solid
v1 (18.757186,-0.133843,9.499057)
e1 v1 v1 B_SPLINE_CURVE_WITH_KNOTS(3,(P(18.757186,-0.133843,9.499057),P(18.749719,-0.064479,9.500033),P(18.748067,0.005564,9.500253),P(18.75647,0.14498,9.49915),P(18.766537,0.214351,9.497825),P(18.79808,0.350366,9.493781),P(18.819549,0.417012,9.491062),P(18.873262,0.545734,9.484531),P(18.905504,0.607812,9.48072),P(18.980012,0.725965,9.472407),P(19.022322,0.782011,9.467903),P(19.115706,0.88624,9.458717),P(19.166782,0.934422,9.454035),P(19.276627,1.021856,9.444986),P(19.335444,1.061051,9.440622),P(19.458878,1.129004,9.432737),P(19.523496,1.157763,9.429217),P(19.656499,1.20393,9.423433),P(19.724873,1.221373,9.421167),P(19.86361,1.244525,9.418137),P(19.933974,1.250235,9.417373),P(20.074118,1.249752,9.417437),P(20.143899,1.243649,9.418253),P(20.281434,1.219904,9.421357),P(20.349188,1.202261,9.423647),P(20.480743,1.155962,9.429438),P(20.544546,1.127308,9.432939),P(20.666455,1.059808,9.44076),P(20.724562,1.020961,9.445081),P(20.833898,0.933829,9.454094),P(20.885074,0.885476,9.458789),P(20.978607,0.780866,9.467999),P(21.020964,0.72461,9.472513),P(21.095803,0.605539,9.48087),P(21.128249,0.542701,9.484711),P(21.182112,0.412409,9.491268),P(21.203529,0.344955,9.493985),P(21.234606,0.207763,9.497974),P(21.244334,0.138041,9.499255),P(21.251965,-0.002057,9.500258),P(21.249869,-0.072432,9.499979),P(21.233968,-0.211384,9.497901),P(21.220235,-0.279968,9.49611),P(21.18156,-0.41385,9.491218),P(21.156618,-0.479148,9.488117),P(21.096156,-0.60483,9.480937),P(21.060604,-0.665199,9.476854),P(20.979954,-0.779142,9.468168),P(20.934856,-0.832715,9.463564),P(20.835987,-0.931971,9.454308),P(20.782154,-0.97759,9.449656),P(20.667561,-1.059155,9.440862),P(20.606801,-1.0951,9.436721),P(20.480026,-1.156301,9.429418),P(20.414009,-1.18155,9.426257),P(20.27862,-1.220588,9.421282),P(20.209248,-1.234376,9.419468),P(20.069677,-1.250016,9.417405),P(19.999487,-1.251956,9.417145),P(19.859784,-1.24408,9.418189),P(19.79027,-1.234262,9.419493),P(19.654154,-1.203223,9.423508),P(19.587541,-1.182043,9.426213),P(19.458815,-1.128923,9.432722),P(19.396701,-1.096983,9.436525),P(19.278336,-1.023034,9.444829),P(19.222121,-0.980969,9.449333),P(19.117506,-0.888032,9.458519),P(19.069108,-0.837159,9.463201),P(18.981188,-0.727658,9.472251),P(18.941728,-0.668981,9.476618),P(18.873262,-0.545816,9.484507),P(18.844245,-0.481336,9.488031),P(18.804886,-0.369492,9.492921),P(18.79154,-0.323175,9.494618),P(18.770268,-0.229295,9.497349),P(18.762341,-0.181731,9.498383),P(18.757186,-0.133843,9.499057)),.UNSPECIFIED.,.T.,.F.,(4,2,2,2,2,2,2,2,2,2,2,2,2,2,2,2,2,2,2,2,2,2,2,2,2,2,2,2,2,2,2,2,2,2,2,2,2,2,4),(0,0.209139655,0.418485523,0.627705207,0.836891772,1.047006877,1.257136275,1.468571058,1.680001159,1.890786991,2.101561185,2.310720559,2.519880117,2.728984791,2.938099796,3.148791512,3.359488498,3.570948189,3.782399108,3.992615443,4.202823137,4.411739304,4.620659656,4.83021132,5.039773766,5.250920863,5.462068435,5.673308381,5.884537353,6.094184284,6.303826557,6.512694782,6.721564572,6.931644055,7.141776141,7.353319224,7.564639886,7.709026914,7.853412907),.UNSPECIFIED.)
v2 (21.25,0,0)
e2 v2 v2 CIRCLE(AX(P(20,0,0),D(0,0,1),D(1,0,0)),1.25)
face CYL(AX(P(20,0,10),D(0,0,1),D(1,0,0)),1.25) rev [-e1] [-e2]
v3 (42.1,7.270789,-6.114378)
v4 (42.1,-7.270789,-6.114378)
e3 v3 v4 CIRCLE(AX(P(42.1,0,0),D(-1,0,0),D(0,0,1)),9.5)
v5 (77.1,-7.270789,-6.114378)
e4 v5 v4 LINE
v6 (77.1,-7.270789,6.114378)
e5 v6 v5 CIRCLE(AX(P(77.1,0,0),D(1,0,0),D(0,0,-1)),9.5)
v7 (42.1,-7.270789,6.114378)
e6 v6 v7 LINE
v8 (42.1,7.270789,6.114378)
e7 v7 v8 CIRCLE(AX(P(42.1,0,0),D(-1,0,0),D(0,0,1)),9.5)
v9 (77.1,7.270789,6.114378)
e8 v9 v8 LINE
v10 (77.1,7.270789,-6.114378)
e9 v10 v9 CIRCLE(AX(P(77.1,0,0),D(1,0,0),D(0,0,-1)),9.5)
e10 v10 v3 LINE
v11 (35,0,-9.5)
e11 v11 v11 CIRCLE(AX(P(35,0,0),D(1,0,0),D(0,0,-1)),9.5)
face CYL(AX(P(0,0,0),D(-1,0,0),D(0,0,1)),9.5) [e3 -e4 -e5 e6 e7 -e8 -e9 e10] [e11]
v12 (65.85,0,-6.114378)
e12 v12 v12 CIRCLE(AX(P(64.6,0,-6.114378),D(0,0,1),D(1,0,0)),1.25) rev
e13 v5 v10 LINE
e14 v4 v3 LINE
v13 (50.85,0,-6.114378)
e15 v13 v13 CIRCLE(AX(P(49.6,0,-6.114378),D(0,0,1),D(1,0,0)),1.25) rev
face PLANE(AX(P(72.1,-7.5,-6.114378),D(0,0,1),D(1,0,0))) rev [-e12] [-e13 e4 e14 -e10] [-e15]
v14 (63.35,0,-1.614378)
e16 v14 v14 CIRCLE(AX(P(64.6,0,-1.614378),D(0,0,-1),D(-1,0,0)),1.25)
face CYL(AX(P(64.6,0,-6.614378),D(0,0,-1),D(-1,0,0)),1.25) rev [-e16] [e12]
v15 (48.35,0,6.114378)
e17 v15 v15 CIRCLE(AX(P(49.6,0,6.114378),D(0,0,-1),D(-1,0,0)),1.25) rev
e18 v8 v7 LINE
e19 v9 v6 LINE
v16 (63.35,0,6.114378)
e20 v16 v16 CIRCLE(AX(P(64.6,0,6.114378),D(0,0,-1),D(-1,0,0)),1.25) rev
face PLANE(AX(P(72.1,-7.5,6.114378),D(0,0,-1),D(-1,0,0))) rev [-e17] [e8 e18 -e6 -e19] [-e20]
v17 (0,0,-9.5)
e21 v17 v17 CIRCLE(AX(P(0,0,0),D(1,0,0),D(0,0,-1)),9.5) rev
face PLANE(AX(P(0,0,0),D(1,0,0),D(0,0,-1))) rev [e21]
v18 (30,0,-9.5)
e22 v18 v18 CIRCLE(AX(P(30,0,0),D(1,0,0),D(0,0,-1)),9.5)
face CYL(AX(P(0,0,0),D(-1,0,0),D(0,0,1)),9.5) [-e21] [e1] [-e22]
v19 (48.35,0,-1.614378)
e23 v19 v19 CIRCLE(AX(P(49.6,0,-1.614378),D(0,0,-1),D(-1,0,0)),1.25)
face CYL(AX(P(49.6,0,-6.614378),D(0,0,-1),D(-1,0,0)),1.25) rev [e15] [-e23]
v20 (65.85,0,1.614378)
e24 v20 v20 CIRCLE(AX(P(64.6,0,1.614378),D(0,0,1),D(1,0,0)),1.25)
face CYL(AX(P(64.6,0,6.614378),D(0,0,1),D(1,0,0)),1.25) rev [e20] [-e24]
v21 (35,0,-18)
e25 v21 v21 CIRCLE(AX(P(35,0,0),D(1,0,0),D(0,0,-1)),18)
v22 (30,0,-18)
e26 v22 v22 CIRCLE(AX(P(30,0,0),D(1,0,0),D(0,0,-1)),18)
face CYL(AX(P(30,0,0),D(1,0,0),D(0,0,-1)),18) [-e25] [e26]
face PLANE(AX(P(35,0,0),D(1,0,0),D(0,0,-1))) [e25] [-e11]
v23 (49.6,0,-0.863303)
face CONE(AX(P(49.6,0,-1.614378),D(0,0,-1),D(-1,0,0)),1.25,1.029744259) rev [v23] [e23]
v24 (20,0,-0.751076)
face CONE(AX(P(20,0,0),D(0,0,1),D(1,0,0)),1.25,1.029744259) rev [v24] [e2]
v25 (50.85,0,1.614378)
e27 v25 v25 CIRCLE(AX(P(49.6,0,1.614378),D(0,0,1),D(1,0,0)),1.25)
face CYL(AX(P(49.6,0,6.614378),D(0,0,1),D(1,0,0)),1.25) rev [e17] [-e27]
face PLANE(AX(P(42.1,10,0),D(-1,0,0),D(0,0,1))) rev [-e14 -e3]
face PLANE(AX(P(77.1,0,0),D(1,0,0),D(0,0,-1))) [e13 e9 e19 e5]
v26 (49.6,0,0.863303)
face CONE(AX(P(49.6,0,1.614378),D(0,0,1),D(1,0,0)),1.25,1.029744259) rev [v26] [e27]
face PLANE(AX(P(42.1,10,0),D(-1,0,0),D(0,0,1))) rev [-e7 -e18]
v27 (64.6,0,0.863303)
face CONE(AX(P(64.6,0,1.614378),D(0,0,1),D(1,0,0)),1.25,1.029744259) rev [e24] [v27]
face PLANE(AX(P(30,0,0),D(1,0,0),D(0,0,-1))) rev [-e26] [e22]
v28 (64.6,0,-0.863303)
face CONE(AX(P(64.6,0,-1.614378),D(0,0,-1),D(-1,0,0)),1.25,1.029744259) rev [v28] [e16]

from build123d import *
from build123d.topology import SkipClean

# Parameters (mm, degrees)
SKETCH1_W                           = 42.1
SKETCH1_H                           = 10
BOSS_EXTRUDE1_START                 = 30
BOSS_EXTRUDE1_DEPTH                 = 30
BOSS_EXTRUDE2_START                 = -7.1
SKETCH8_R                           = 18
BOSS_EXTRUDE2_DEPTH                 = 5
M3X0_5_TAPPED_HOLE3_D               = 2.5
M3X0_5_TAPPED_HOLE3_DEPTH           = 10
M3X0_5_TAPPED_HOLE3_TIP             = 0.751076
M3X0_5_TAPPED_HOLE2_D               = 2.5
M3X0_5_TAPPED_HOLE2_DEPTH           = 5
M3X0_5_TAPPED_HOLE2_TIP             = 0.751076
M3X0_5_TAPPED_HOLE2_ON_FACE_2_D     = 2.5
M3X0_5_TAPPED_HOLE2_ON_FACE_2_DEPTH = 5
M3X0_5_TAPPED_HOLE2_ON_FACE_2_TIP   = 0.751076
BOSS_EXTRUDE3_START                 = 5
BOSS_EXTRUDE3_DEPTH                 = 5
TOLERANCING_START                   = 42.1
TOLERANCING_DEPTH                   = 35
TOLERANCING_2_OUTLINE_R             = 10
TOLERANCING_2_OUTLINE_R_2           = 9.5
TOLERANCING_2_DEPTH                 = 30
TOLERANCING_START_2                 = 35
TOLERANCING_3_OUTLINE_R             = 10
TOLERANCING_3_OUTLINE_R_2           = 9.5
TOLERANCING_3_DEPTH                 = 7.1


# Read off the part's stored shape, not the designer's step: Tolerancing
with BuildPart() as part:
    # Sketch1 → Revolve1 (revolve)
    with BuildSketch(Plane.XY, mode=Mode.PRIVATE) as revolve1_sk:
        with Locations((21.05, 5)):
            Rectangle(SKETCH1_W, SKETCH1_H)
    revolve(revolve1_sk.sketch.rotate(Axis((0, 0, 0), (1, 0, 0)), 90), axis=Axis((0, 0, 0), (1, 0, 0)))

    # Sketch3 → Boss-Extrude1 (add)
    with BuildSketch(Plane(origin=(42.1, 0, 0), x_dir=(0, 0, -1), z_dir=(1, 0, 0)).offset(BOSS_EXTRUDE1_START)):
        with BuildLine():
            Line((-6.614378, -7.5), (-6.614378, 7.5))
            ThreePointArc((-6.614378, 7.5), (0, 10), (6.614378, 7.5))
            Line((6.614378, 7.5), (6.614378, -7.5))
            ThreePointArc((6.614378, -7.5), (0, -10), (-6.614378, -7.5))
        make_face()
    extrude(amount=-BOSS_EXTRUDE1_DEPTH)

    # Sketch8 → Boss-Extrude2 (add)
    with BuildSketch(Plane(origin=(42.1, 0, 0), x_dir=(0, 0, -1), z_dir=(1, 0, 0)).offset(BOSS_EXTRUDE2_START)):
        Circle(SKETCH8_R)
    extrude(amount=-BOSS_EXTRUDE2_DEPTH)

    # M3x0.5 Tapped Hole3
    with Locations(Plane.XY.offset(10)):
        with Locations((20, 0)):
            Hole(M3X0_5_TAPPED_HOLE3_D / 2, depth=M3X0_5_TAPPED_HOLE3_DEPTH)
            with Locations((0, 0, -(M3X0_5_TAPPED_HOLE3_DEPTH + M3X0_5_TAPPED_HOLE3_TIP / 2))):  # 118° drill point
                Cone(0, M3X0_5_TAPPED_HOLE3_D / 2, M3X0_5_TAPPED_HOLE3_TIP, mode=Mode.SUBTRACT)

    # M3x0.5 Tapped Hole2
    with Locations(Plane(origin=(49.6, 0, 6.614378), x_dir=(1, 0, 0), z_dir=(0, 0, 1))):
        with Locations((0, 0), (15, 0)):
            Hole(M3X0_5_TAPPED_HOLE2_D / 2, depth=M3X0_5_TAPPED_HOLE2_DEPTH)
            with Locations((0, 0, -(M3X0_5_TAPPED_HOLE2_DEPTH + M3X0_5_TAPPED_HOLE2_TIP / 2))):  # 118° drill point
                Cone(0, M3X0_5_TAPPED_HOLE2_D / 2, M3X0_5_TAPPED_HOLE2_TIP, mode=Mode.SUBTRACT)

    # M3x0.5 Tapped Hole2 on face 2
    with Locations(Plane(origin=(64.6, 0, -6.614378), x_dir=(-1, 0, 0), z_dir=(0, 0, -1))):
        with Locations((0, 0), (15, 0)):
            Hole(M3X0_5_TAPPED_HOLE2_ON_FACE_2_D / 2, depth=M3X0_5_TAPPED_HOLE2_ON_FACE_2_DEPTH)
            with Locations((0, 0, -(M3X0_5_TAPPED_HOLE2_ON_FACE_2_DEPTH + M3X0_5_TAPPED_HOLE2_ON_FACE_2_TIP / 2))):  # 118° drill point
                Cone(0, M3X0_5_TAPPED_HOLE2_ON_FACE_2_D / 2, M3X0_5_TAPPED_HOLE2_ON_FACE_2_TIP, mode=Mode.SUBTRACT)

    # Sketch9 → Boss-Extrude3 (add)
    with SkipClean():  # the faces are left unmerged after this step: merging them gives an invalid solid
        with BuildSketch(Plane(origin=(72.1, 0, 0), x_dir=(0, 0, -1), z_dir=(1, 0, 0)).offset(BOSS_EXTRUDE3_START)):
            with BuildLine():
                Line((6.614378, -7.5), (6.614378, 7.5))
                ThreePointArc((6.614378, 7.5), (0, 10), (-6.614378, 7.5))
                Line((-6.614378, 7.5), (-6.614378, -7.5))
                ThreePointArc((-6.614378, -7.5), (0, -10), (6.614378, -7.5))
            make_face()
        extrude(amount=-BOSS_EXTRUDE3_DEPTH)

    # Tolerancing outline → Tolerancing (cut)
    with BuildSketch(Plane.YZ.offset(TOLERANCING_START)):
        with BuildLine():
            Line((7.5, 6.614378), (-7.5, 6.614378))
            ThreePointArc((-7.5, 6.614378), (-10, 0), (-7.5, -6.614378))
            Line((-7.5, -6.614378), (7.5, -6.614378))
            ThreePointArc((7.5, -6.614378), (10, 0), (7.5, 6.614378))
        make_face()
        with BuildLine():
            ThreePointArc((7.270789, 6.114378), (9.5, 0), (7.270789, -6.114378))
            Line((7.270789, -6.114378), (-7.270789, -6.114378))
            ThreePointArc((-7.270789, -6.114378), (-9.5, 0), (-7.270789, 6.114378))
            Line((-7.270789, 6.114378), (7.270789, 6.114378))
        make_face(mode=Mode.SUBTRACT)
    extrude(amount=TOLERANCING_DEPTH, mode=Mode.SUBTRACT)

    # Tolerancing 2 outline → Tolerancing 2 (cut)
    with BuildSketch(Plane.YZ):
        Circle(TOLERANCING_2_OUTLINE_R)
        Circle(TOLERANCING_2_OUTLINE_R_2, mode=Mode.SUBTRACT)
    extrude(amount=TOLERANCING_2_DEPTH, mode=Mode.SUBTRACT)

    # Tolerancing 3 outline → Tolerancing 3 (cut)
    with BuildSketch(Plane.YZ.offset(TOLERANCING_START_2)):
        Circle(TOLERANCING_3_OUTLINE_R)
        Circle(TOLERANCING_3_OUTLINE_R_2, mode=Mode.SUBTRACT)
    extrude(amount=TOLERANCING_3_DEPTH, mode=Mode.SUBTRACT)


solid = part.part
